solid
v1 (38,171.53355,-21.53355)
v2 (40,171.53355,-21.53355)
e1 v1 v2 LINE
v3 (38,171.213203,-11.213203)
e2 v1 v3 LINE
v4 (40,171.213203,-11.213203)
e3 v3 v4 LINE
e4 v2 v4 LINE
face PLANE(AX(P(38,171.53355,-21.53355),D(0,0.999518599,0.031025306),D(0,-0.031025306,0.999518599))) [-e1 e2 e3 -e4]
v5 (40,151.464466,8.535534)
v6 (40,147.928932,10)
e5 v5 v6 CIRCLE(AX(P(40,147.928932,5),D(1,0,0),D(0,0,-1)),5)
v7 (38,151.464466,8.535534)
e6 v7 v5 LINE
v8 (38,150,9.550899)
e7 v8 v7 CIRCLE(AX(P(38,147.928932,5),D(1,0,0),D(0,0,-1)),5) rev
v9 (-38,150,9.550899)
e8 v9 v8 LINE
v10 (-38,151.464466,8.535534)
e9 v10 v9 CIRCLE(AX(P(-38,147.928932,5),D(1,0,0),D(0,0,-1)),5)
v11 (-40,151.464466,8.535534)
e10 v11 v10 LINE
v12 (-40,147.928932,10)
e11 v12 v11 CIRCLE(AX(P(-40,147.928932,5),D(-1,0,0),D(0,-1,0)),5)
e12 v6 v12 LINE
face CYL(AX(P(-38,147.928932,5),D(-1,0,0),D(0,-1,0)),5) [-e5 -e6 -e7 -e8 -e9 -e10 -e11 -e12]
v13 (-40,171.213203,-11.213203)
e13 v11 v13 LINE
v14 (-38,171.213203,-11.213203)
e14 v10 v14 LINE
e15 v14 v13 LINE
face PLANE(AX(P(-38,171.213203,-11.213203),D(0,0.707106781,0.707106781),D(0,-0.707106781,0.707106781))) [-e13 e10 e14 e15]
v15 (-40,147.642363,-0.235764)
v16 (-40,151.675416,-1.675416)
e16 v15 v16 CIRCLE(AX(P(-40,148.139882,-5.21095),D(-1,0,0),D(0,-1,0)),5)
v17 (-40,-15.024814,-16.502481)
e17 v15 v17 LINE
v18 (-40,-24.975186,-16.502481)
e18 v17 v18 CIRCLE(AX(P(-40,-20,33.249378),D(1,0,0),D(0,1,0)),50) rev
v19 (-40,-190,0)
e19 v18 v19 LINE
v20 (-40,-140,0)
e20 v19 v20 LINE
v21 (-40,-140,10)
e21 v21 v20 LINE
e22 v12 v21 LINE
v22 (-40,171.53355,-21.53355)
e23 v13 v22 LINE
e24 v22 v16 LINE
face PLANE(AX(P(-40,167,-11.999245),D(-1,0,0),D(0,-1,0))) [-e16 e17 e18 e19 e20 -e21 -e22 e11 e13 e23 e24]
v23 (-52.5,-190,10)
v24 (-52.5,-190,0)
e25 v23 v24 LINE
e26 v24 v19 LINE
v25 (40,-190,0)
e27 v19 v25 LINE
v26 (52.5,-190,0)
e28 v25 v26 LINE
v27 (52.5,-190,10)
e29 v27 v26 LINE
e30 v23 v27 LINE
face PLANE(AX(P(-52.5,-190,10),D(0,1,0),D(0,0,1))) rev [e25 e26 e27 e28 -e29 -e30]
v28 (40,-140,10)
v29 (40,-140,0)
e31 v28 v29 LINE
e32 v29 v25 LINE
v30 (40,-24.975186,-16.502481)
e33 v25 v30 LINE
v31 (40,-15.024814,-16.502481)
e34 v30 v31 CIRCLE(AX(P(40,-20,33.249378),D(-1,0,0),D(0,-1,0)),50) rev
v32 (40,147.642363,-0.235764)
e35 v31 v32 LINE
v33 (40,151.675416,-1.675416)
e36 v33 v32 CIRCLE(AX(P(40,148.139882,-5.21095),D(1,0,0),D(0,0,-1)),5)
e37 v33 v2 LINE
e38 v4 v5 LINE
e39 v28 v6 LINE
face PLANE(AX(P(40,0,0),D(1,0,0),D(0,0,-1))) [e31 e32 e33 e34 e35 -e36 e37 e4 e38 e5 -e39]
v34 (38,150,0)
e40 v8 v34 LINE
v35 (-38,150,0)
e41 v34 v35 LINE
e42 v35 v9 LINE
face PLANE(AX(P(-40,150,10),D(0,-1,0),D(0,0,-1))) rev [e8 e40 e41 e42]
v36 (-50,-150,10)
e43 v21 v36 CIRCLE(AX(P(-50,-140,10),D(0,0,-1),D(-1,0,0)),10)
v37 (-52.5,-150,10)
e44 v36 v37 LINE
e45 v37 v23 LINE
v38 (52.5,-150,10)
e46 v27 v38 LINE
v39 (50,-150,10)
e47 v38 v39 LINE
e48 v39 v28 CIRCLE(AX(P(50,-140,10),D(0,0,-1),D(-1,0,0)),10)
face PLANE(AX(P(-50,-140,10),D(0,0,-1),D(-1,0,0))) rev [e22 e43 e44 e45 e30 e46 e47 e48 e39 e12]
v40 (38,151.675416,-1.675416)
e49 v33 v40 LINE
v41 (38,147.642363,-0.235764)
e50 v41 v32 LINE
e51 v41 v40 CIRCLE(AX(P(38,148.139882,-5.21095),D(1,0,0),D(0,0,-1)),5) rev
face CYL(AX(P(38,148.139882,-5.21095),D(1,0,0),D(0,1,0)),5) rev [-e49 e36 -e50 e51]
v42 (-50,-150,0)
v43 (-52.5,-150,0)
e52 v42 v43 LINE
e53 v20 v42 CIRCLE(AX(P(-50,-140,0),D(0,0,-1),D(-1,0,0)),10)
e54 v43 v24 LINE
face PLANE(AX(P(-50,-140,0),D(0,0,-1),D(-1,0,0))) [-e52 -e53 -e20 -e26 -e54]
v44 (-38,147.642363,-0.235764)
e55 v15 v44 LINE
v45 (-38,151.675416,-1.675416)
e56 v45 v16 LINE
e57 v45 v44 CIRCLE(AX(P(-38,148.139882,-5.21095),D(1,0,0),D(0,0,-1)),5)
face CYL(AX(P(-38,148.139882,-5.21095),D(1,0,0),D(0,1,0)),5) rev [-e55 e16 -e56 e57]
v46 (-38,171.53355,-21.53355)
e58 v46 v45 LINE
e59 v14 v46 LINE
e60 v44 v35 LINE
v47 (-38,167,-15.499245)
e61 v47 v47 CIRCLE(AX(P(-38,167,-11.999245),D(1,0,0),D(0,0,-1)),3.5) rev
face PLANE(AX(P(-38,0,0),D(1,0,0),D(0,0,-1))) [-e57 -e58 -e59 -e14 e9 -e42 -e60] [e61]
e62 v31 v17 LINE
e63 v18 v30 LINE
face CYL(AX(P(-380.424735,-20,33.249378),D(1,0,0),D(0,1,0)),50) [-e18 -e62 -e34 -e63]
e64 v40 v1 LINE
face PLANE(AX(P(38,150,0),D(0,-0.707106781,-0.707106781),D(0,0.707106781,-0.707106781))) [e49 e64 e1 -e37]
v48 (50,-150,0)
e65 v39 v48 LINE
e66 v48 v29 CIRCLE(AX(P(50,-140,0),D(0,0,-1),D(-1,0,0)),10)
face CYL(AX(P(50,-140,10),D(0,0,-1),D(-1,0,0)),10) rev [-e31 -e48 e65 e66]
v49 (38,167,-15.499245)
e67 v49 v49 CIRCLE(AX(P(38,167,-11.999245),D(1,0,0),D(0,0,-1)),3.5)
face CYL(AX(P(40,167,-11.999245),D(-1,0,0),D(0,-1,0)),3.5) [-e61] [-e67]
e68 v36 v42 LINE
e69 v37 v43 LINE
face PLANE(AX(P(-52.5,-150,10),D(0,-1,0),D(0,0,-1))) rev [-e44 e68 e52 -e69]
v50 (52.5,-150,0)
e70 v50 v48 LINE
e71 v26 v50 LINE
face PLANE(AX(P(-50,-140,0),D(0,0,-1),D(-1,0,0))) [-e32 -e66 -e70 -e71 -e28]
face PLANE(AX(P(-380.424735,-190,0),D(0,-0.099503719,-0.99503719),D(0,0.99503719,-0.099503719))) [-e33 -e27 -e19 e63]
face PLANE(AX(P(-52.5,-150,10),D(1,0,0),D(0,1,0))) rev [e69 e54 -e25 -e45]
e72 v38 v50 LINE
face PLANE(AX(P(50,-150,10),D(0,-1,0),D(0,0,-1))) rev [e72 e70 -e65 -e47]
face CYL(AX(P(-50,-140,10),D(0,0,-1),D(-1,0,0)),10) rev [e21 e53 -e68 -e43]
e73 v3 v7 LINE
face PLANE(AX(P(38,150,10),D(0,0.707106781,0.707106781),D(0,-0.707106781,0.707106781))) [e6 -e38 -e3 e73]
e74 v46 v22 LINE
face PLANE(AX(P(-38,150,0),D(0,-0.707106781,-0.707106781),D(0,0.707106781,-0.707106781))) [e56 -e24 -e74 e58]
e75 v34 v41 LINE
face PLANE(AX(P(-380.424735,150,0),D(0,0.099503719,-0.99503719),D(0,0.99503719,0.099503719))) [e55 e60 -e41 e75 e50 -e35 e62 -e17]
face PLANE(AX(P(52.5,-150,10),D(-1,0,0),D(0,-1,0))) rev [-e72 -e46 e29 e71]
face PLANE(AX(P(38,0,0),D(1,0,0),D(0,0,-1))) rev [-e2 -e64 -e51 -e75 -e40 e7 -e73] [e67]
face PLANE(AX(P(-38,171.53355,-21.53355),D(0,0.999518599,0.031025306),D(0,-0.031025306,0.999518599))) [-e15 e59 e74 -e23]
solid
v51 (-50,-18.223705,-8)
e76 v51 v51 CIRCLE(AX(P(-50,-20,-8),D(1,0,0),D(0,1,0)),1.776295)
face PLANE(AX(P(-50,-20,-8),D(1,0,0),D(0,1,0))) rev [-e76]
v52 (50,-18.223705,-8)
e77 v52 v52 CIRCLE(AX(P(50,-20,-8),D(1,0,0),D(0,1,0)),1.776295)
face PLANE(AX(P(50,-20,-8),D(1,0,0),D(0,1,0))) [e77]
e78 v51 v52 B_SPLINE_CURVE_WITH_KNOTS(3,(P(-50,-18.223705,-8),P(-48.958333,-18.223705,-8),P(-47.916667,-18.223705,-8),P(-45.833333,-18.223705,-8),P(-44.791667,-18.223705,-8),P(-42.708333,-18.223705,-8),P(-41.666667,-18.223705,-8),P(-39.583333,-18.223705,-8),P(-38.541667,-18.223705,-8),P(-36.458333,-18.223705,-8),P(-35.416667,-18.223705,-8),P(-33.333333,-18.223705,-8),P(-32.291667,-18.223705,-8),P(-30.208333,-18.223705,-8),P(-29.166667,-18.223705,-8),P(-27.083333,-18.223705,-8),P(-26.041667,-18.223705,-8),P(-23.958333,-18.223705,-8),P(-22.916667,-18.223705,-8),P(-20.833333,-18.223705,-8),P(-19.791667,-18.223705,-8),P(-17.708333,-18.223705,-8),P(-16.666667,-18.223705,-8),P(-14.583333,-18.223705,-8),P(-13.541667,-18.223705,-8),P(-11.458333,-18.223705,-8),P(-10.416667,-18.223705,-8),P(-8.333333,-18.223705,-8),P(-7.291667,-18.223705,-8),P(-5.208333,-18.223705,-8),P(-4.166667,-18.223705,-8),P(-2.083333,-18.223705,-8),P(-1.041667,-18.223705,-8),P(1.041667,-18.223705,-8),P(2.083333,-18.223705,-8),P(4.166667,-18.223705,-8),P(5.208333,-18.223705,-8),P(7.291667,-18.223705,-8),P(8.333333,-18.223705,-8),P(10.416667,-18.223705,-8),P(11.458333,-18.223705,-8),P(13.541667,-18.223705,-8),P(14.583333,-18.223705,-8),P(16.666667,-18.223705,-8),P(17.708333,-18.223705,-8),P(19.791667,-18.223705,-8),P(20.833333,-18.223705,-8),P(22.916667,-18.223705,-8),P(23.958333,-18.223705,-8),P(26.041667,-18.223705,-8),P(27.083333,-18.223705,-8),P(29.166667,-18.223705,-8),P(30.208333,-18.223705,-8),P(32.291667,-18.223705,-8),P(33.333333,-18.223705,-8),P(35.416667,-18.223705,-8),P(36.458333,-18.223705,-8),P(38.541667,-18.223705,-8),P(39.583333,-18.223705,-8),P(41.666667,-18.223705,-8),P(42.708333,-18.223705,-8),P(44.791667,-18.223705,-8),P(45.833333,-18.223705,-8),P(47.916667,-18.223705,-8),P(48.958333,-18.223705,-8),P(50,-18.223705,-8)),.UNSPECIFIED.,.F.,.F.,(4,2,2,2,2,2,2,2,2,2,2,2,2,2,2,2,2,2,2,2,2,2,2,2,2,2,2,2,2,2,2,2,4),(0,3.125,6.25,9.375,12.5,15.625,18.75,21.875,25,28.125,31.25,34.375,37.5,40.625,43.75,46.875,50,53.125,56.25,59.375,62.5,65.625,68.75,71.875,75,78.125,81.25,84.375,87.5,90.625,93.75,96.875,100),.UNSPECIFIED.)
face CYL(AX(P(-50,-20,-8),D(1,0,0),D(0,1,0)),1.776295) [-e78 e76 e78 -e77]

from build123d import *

# Parameters (mm, degrees)
BOSS_EXTRUDE1_DEPTH      = 10
BOSS_EXTRUDE2_DEPTH      = 10
BOSS_EXTRUDE2_DEPTH_BACK = 90
SKETCH2_R                = 1.776294634
BOSS_EXTRUDE3_DEPTH      = 80
FILLET1_R                = 50
BOSS_EXTRUDE6_DEPTH      = 2
BOSS_EXTRUDE7_DEPTH      = 2
SKETCH7_R                = 3.5
BOSS_EXTRUDE8_DEPTH      = 80
FILLET2_START            = -41
FILLET2_DEPTH            = 82
FILLET3_R                = 5
FILLET4_R                = 5


with BuildPart() as part:
    # Sketch1 → Boss-Extrude1 (new body)
    with BuildSketch(Plane.XY):
        with BuildLine():
            Line((50, -150), (52.5, -150))
            Line((52.5, -150), (52.5, -190))
            Line((52.5, -190), (-52.5, -190))
            Line((-52.5, -190), (-52.5, -150))
            Line((-52.5, -150), (-50, -150))
            ThreePointArc((-50, -150), (-42.928932188, -147.071067812), (-40, -140))
            Line((-40, -140), (-40, 150))
            Line((-40, 150), (40, 150))
            Line((40, 150), (40, -140))
            ThreePointArc((40, -140), (42.928932188, -147.071067812), (50, -150))
        make_face()
    extrude(amount=BOSS_EXTRUDE1_DEPTH)

    # Sketch3 → Boss-Extrude3 (add)
    with BuildSketch(Plane(origin=(40, 0, 0), x_dir=(0, 0, -1), z_dir=(1, 0, 0))):
        Polygon((0, 150), (17, -20), (0, -190), align=None)
    extrude(amount=-BOSS_EXTRUDE3_DEPTH)

    # Fillet1
    fillet1_edges = [part.edges().sort_by_distance(p)[0] for p in [
        (0, -20, -17),
    ]]
    fillet(fillet1_edges, radius=FILLET1_R)

    # Sketch6 → Boss-Extrude7 (add)
    with BuildSketch(Plane.ZY.offset(40)):
        Polygon((10, 150), (0, 150), (-21.533549548, 171.533549548), (-11.213203436, 171.213203436), align=None)
    extrude(amount=-BOSS_EXTRUDE7_DEPTH)



with BuildPart() as body_2:
    # Sketch2 → Boss-Extrude2 (new, two sides: drawn at the far end of the back side and taken through both)
    with BuildSketch(Plane(origin=(40, 0, 0), x_dir=(0, 0, -1), z_dir=(1, 0, 0)).offset(-BOSS_EXTRUDE2_DEPTH_BACK)):
        with Locations(Location((8, -20, 0), (0, 0, 90))):
            Circle(SKETCH2_R)
    extrude(amount=BOSS_EXTRUDE2_DEPTH + BOSS_EXTRUDE2_DEPTH_BACK)


with BuildPart() as body_3:
    # Sketch5 → Boss-Extrude6 (new body)
    with BuildSketch(Plane(origin=(40, 0, 0), x_dir=(0, 0, -1), z_dir=(1, 0, 0))):
        Polygon((0, 150), (-10, 150), (11.213203436, 171.213203436), (21.533549548, 171.533549548), align=None)
    extrude(amount=-BOSS_EXTRUDE6_DEPTH)


with BuildPart() as part_1:
    add(part.part)

    add(body_3.part)  # Boss-Extrude8 merges body 3
    # Sketch7 → Boss-Extrude8 (add)
    with BuildSketch(Plane.ZY.offset(40)):
        with Locations(Location((-11.999244943, 167, 0), (0, 0, 180))):
            Circle(SKETCH7_R)
    extrude(amount=-BOSS_EXTRUDE8_DEPTH)

    # Fillet2: read off the stored shape, not the designer's step
    # Fillet2 outline → Fillet2 (cut)
    with BuildSketch(Plane.YZ.offset(FILLET2_START)):
        with BuildLine():
            Line((150, 10), (147.928932188, 10))
            ThreePointArc((147.928932188, 10), (149.84234935, 9.619397663), (151.464466094, 8.535533906))
            Line((151.464466094, 8.535533906), (150, 10))
        make_face()
    extrude(amount=FILLET2_DEPTH, mode=Mode.SUBTRACT)

    # Fillet3
    fillet3_edges = [part_1.edges().sort_by_distance(p)[0] for p in [
        (39, 150, 0),
    ]]
    fillet(fillet3_edges, radius=FILLET3_R)

    # Fillet4
    fillet4_edges = [part_1.edges().sort_by_distance(p)[0] for p in [
        (-39, 150, 0),
    ]]
    fillet(fillet4_edges, radius=FILLET4_R)


solid = Compound([body_2.part, part_1.part])
